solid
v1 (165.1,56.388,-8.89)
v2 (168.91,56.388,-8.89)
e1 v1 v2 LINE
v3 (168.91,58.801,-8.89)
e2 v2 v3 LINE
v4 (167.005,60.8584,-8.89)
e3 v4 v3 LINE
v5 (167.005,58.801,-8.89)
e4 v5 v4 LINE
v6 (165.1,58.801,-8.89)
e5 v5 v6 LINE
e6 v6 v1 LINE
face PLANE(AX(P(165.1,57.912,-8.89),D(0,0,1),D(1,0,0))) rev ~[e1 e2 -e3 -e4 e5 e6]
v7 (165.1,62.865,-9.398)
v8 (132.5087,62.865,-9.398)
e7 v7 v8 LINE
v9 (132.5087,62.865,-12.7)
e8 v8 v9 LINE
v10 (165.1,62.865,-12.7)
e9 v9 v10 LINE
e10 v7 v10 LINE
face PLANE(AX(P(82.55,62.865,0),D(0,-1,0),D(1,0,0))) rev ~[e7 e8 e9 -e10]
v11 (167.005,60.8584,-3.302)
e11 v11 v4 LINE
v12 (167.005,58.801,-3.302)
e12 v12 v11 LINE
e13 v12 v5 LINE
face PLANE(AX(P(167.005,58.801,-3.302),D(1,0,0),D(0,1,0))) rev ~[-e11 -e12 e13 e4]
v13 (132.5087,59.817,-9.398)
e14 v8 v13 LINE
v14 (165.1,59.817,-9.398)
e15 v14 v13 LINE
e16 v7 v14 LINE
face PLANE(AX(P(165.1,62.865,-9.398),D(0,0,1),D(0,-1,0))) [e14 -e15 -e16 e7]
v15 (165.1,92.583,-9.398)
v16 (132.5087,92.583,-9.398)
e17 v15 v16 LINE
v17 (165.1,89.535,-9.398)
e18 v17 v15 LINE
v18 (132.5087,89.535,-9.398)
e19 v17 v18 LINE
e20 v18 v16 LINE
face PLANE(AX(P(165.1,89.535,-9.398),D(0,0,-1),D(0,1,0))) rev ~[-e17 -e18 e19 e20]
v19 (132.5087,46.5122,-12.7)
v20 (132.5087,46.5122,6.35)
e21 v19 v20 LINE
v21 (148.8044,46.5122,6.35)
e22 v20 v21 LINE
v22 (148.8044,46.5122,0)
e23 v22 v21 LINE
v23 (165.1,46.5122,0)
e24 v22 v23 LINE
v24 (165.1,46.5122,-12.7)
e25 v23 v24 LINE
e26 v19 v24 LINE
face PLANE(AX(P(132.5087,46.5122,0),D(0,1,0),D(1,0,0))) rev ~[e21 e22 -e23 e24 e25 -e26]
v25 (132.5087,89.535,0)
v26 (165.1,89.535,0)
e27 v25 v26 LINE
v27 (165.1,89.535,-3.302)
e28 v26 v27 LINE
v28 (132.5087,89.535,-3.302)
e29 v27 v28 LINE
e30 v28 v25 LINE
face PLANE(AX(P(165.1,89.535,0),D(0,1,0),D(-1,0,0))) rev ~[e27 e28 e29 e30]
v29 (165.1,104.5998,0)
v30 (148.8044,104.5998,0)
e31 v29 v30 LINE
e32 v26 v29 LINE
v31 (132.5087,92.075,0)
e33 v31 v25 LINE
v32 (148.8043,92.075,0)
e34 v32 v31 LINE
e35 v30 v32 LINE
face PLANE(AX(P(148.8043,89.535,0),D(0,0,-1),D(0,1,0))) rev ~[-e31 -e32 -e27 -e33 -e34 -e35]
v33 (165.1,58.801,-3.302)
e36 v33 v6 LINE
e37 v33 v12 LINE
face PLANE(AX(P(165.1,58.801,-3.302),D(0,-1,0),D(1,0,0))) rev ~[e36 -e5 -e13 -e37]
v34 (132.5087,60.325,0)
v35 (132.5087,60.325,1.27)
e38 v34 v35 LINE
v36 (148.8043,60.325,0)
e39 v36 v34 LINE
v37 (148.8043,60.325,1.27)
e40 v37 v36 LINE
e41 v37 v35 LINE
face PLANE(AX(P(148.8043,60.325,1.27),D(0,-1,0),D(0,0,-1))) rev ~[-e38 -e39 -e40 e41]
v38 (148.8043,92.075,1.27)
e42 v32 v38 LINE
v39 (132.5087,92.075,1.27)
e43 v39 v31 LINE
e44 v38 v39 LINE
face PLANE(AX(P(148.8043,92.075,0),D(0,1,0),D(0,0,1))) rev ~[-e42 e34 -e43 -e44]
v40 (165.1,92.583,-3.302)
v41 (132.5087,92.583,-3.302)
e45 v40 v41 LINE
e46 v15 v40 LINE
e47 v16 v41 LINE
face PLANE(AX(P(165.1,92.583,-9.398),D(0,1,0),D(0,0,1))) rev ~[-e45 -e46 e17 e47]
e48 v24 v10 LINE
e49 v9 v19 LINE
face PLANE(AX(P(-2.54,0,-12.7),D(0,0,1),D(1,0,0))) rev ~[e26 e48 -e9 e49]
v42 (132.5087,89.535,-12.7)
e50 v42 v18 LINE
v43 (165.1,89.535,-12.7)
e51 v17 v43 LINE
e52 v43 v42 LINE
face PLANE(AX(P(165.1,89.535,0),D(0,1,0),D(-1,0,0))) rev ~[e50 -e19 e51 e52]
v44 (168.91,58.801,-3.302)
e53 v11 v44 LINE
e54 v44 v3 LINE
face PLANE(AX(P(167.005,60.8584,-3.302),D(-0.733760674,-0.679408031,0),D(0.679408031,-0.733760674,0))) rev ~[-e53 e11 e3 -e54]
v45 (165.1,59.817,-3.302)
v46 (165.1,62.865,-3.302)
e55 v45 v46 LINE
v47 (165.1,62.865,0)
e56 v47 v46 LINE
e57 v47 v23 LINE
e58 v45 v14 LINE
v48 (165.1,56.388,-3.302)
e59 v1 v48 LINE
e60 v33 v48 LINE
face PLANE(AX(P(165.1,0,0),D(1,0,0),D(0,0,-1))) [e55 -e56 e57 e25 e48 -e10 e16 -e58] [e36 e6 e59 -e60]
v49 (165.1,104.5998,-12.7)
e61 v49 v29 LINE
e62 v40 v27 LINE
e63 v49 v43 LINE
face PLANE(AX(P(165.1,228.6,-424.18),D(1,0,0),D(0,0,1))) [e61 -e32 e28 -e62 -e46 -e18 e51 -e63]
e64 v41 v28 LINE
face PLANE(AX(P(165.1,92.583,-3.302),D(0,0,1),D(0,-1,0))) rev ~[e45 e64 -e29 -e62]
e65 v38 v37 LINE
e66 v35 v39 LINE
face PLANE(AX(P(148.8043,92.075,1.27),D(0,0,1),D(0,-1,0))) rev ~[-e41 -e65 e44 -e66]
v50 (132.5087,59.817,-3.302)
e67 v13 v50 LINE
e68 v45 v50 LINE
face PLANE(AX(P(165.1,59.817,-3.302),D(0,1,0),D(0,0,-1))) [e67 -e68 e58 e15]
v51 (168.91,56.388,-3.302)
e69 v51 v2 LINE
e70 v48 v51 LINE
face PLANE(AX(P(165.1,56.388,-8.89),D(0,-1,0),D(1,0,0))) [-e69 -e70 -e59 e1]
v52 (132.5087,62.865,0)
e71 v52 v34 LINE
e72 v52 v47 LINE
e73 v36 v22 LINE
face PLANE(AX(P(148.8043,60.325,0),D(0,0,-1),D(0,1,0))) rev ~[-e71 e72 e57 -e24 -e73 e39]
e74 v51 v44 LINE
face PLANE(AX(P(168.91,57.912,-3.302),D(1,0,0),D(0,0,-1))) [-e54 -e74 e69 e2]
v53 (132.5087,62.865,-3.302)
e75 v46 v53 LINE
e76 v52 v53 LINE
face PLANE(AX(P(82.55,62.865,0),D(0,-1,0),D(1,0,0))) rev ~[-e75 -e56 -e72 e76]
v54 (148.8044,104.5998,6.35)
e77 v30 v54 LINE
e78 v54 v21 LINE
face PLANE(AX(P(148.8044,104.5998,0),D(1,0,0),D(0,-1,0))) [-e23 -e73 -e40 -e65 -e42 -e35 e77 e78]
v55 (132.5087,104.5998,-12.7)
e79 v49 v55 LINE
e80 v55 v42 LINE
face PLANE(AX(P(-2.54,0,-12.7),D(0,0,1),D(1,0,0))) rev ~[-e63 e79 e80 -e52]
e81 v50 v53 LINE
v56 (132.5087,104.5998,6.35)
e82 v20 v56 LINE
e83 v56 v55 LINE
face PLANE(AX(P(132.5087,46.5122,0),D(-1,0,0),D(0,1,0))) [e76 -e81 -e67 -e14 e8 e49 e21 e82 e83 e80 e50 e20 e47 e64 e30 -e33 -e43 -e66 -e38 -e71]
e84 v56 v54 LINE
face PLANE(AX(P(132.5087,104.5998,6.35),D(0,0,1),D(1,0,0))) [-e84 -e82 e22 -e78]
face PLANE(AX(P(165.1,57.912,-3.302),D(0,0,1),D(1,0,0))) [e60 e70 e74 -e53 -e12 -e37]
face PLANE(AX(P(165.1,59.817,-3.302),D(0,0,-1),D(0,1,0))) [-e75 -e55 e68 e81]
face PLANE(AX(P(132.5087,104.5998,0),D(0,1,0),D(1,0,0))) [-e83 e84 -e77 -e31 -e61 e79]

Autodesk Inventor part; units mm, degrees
ref_plane "YZ Plane" through (0, 0, 0) normal (1, 0, 0) x (0, 1, 0)
ref_plane "XZ Plane" through (0, 0, 0) normal (0, 1, 0) x (-1, 0, 0)
sketch "Sketch1" plane through (0, 0, 0) normal (1, 0, 0) x (0, 1, 0)
  line L0 (0, 0) -> (228.6, 0)
  line L1 (228.6, 0) -> (228.6, -424.18)
  line L2 (228.6, -424.18) -> (0, -424.18)
  line L3 (0, -424.18) -> (0, 0)
  point P0 (0, 0)
  dimension "d0" = 424.18
  dimension "d1" = 228.6
extrude "Extrusion1" add sketch "Sketch1" along normal blind 165.1
sketch "Sketch2" plane through (165.1, 0, 0) normal (1, 0, 0) x (0, 0, -1)
  line L0 (0, 0) -> (424.18, 0) construction
  line L1 (12.7, 0) -> (411.48, 0)
  line L2 (411.48, 0) -> (411.48, 165.1)
  line L3 (411.48, 165.1) -> (12.7, 165.1)
  line L4 (12.7, 165.1) -> (12.7, 0)
  line L5 (0, 228.6) -> (0, 0) construction
  line L6 (424.18, 0) -> (424.18, 228.6) construction
  dimension "d4" = 398.78
  dimension "d5" = 165.1
  dimension "d6" = 12.7
  dimension "d7" = 12.7
extrude "Extrusion2" cut sketch "Sketch2" against normal blind 148.59
sketch "Sketch3" plane through (0, 0, 0) normal (0, 0, 1) x (1, 0, 0)
  line L0 (165.1, 228.6) -> (165.1, 0) projected
  line L1 (165.1, 89.535) -> (82.55, 89.535)
  line L2 (69.215, 89.535) -> (69.215, 62.865) construction
  line L3 (82.55, 62.865) -> (165.1, 62.865)
  line L4 (165.1, 62.865) -> (165.1, 89.535)
  line L5 (0, 0) -> (165.1, 0) projected
  arc A0 (82.55, 89.535) -> (82.55, 62.865) centre (82.55, 76.2) ccw
  dimension "d10" = 95.885
  dimension "d11" = 26.67
  dimension "d12" = 62.865
extrude "Extrusion3" cut sketch "Sketch3" against normal blind 457.2
sketch "Sketch4" plane through (0, 228.6, 0) normal (0, 1, 0) x (1, 0, 0)
  line L0 (165.1, 12.7) -> (165.1, 411.48) construction
  line L1 (165.1, 12.7) -> (16.51, 12.7) construction
  line L2 (16.51, 12.7) -> (16.51, 411.48) construction
  line L3 (165.1, 411.48) -> (16.51, 411.48) construction
  line L4 (0, 424.18) -> (165.1, 424.18) construction
  line L5 (0, 424.18) -> (165.1, 424.18) construction
  circle A0 centre (82.55, 353.06) radius 43.815
  line L6 (0, 0) -> (0, 424.18) construction
  circle A1 centre (82.55, 259.08) radius 43.815
  line L7 (0, 212.09) -> (165.1, 212.09) construction
  line L8 (165.1, 424.18) -> (165.1, 0) construction
  circle A2 centre (82.55, 71.12) radius 43.815
  circle A3 centre (82.55, 165.1) radius 43.815
  dimension "d15" = 87.63
  dimension "d16" = 82.55
  dimension "d17" = 58.42
  dimension "d18" = 87.63
  dimension "d19" = 93.98
  dimension "d20" = 82.55
extrude "Extrusion4" cut sketch "Sketch4" against normal blind 76.2
sketch "Sketch5" plane through (0, 228.6, 0) normal (0, 1, 0) x (1, 0, 0)
  circle A0 centre (82.55, 165.1) radius 43.815 projected
  circle A1 centre (82.55, 353.06) radius 43.815 projected
  circle A2 centre (82.55, 259.08) radius 43.815 projected
  circle A3 centre (82.55, 71.12) radius 43.815 projected
  line L0 (0, 0) -> (0, 424.18) projected
  line L1 (0, 0) -> (165.1, 0) projected
  line L2 (165.1, 424.18) -> (165.1, 0) projected
  line L3 (0, 424.18) -> (165.1, 424.18) projected
  point P0 (0, 0)
extrude "Extrusion5" add sketch "Sketch5" along normal blind 53.34
sketch "Sketch7" plane through (0, 0, 0) normal (-1, 0, 0) x (0, 0, 1)
  line L0 (0, 0) -> (0, 281.94) projected
  line L1 (-424.18, 281.94) -> (0, 281.94) projected
  line L2 (-424.18, 281.94) -> (-424.18, 0) projected
  line L3 (-424.18, 0) -> (0, 0) projected
  point P0 (0, 0)
extrude "Extrusion6" add sketch "Sketch7" along normal blind 19.05
sketch "Sketch8" plane through (16.51, 0, 0) normal (1, 0, 0) x (0, 0, -1)
  line L0 (411.48, 0) -> (12.7, 0) projected
  line L1 (411.48, 165.1) -> (411.48, 0) projected
  line L2 (12.7, 165.1) -> (411.48, 165.1) projected
  line L3 (12.7, 0) -> (12.7, 165.1) projected
  point P0 (0, 0)
extrude "Extrusion7" cut sketch "Sketch8" against normal blind 19.05
sketch "Sketch12" plane through (165.1, 0, 0) normal (1, 0, 0) x (0, 0, -1)
  line L0 (0, 89.535) -> (12.7, 89.535) construction
  line L1 (3.302, 89.535) -> (9.398, 89.535)
  line L2 (9.398, 89.535) -> (9.398, 92.583)
  line L3 (9.398, 92.583) -> (3.302, 92.583)
  line L4 (3.302, 92.583) -> (3.302, 89.535)
  line L5 (0, 89.535) -> (0, 281.94) construction
  line L6 (12.7, 89.535) -> (12.7, 62.865) construction
  line L7 (0, 89.535) -> (12.7, 89.535) construction
  line L8 (0, 62.865) -> (0, 89.535) construction
  line L9 (0, 62.865) -> (12.7, 62.865) construction
  line L10 (0, 62.865) -> (0, 89.535) construction
  line L11 (0, 76.2) -> (12.7, 76.2) construction
  line L12 (3.302, 62.865) -> (9.398, 62.865)
  line L13 (9.398, 62.865) -> (9.398, 59.817)
  line L14 (9.398, 59.817) -> (3.302, 59.817)
  line L15 (3.302, 59.817) -> (3.302, 62.865)
  point P0 (0, 0)
  dimension "d44" = 6.096
  dimension "d45" = 3.048
  dimension "d46" = 3.302
extrude "Extrusion11" cut sketch "Sketch12" against normal blind 82.55
sketch "Sketch13" plane through (-19.05, 0, 0) normal (0, -1, 0) x (1, 0, 0)
  line L0 (16.51, -12.7) -> (184.15, -12.7) projected
  line L1 (184.15, 0) -> (184.15, -12.7) projected
  line L2 (0, 0) -> (184.15, 0) projected
  line L3 (0, -424.18) -> (0, 0) projected
  line L4 (184.15, -424.18) -> (0, -424.18) projected
  line L5 (184.15, -411.48) -> (184.15, -424.18) projected
  line L6 (184.15, -411.48) -> (16.51, -411.48) projected
  line L7 (16.51, -411.48) -> (16.51, -12.7) projected
  point P0 (19.05, 0)
extrude "Extrusion12" add sketch "Sketch13" along normal blind 5.08
ref_plane "Work Plane1" through (82.55, 89.535, -212.09) normal (0, 0, 1) x (1, 0, 0)
mirror "Mirror1" about plane through (82.55, 89.535, -212.09) normal (0, 0, 1) of "Extrusion11"
sketch "Sketch15" plane through (165.1, 0, 0) normal (1, 0, 0) x (0, 0, -1)
  line L0 (3.302, 59.817) -> (8.89, 59.817)
  line L1 (8.89, 59.817) -> (8.89, 57.912)
  line L2 (8.89, 57.912) -> (3.302, 57.912)
  line L3 (3.302, 57.912) -> (3.302, 59.817)
  line L4 (9.398, 59.817) -> (3.302, 59.817) projected
  point P0 (0, 0)
  dimension "d55" = 5.588
  dimension "d56" = 1.905
extrude "Extrusion14" add sketch "Sketch15" along normal blind 3.81
sketch "Sketch17" plane through (165.1, 57.912, -3.302) normal (0, 0, 1) x (1, 0, 0)
  line L0 (0, 1.905) -> (3.81, 1.905) projected
  line L1 (3.81, 1.905) -> (0, 1.905)
  line L2 (0, 1.905) -> (0, 0.889)
  line L3 (0, 0.889) -> (3.81, 0.889)
  line L4 (3.81, 0.889) -> (3.81, 1.905)
  point P0 (-165.1, -57.912)
  dimension "d60" = 3.81
  dimension "d61" = 1.016
extrude "Extrusion15" cut sketch "Sketch17" against normal blind 25.4
sketch "Sketch18" plane through (165.1, 57.912, -3.302) normal (0, 0, 1) x (1, 0, 0)
  line L0 (0, 1.905) -> (-82.55, 1.905) construction
  line L1 (3.81, 0) -> (3.81, 0.889) projected
  line L2 (1.905, 2.9464) -> (3.81, 0.889)
  line L3 (3.81, 0.889) -> (1.905, 0.889)
  line L4 (1.905, 0.889) -> (1.905, 2.9464)
  line L5 (0, 4.953) -> (0, -62.992) projected
  point P0 (-165.1, -57.912)
  dimension "d64" = 1.905
  dimension "d65" = 2.0574
extrude "Extrusion16" add sketch "Sketch18" against normal blind 5.588
sketch "Sketch19" plane through (165.1, 57.912, -8.89) normal (0, -1, 0) x (1, 0, 0)
  line L0 (0, 0) -> (0, 5.588) projected
  line L1 (0, 0) -> (3.81, 0) projected
  line L2 (3.81, 5.588) -> (3.81, 0) projected
  line L3 (0, 5.588) -> (3.81, 5.588) projected
  point P0 (-165.1, 8.89)
extrude "Extrusion17" add sketch "Sketch19" along normal blind 1.524
mirror "Mirror2" about plane through (82.55, 89.535, -212.09) normal (0, 0, 1) of "Extrusion14", "Extrusion15", "Extrusion16", "Extrusion17"
sketch "Sketch21" plane through (82.55, 89.535, 0) normal (0, 0, 1) x (1, 0, 0)
  line L0 (49.9587, -43.0228) -> (93.9109, -43.0228)
  line L1 (93.9109, -43.0228) -> (93.9109, 15.0648)
  line L2 (93.9109, 15.0648) -> (49.9587, 15.0648)
  line L3 (49.9587, 15.0648) -> (49.9587, -43.0228)
  point P0 (-82.55, -89.535)
extrude "Extrusion18" cut sketch "Sketch21" against normal blind 25.4 keep common part
sketch "Sketch22" plane through (132.5087, 104.5998, 0) normal (0, 0, 1) x (1, 0, 0)
  line L0 (0, -58.0876) -> (32.5913, -58.0876) projected
  line L1 (0, 0) -> (16.2957, 0)
  line L2 (16.2957, 0) -> (16.2957, -58.0876)
  line L3 (16.2957, -58.0876) -> (0, -58.0876)
  line L4 (0, -58.0876) -> (0, 0)
  point P0 (-132.5087, -104.5998)
extrude "Extrusion19" add sketch "Sketch22" along normal blind 6.35
sketch "Sketch23" plane through (148.8043, 62.865, 0) normal (1, 0, 0) x (0, 0, -1)
  line L0 (0, 26.67) -> (0, 41.7348) projected
  line L1 (0, 29.21) -> (-1.27, 29.21)
  line L2 (-1.27, 29.21) -> (-1.27, -2.54)
  line L3 (-1.27, -2.54) -> (0, -2.54)
  line L4 (0, -2.54) -> (0, 29.21)
  line L5 (0, 26.67) -> (3.302, 26.67) projected
  line L6 (3.302, 0) -> (0, 0) projected
  point P0 (0, -62.865)
  dimension "d74" = 1.27
  dimension "d75" = 2.54
  dimension "d76" = 2.54
extrude "Extrusion20" cut sketch "Sketch23" against normal blind 25.4
sketch "Sketch9" plane through (0, 281.94, 0) normal (0, 1, 0) x (1, 0, 0)
  line L0 (146.05, 19.05) -> (146.05, 405.13)
  line L1 (0, 405.13) -> (0, 19.05)
  line L2 (165.1, 424.18) -> (-19.05, 424.18) construction
  line L3 (-19.05, 0) -> (-19.05, 424.18) construction
  line L4 (165.1, 0) -> (165.1, 424.18) construction
  line L5 (165.1, 0) -> (-19.05, 0) construction
  circle A0 centre (82.55, 71.12) radius 43.815 construction
  circle A1 centre (82.55, 259.08) radius 43.815 construction
  circle A2 centre (82.55, 353.06) radius 43.815 construction
  circle A3 centre (82.55, 165.1) radius 43.815 construction
  line L6 (165.1, 0) -> (-19.05, 0) construction
  line L7 (165.1, 0) -> (165.1, 424.18) construction
  line L8 (165.1, 424.18) -> (-19.05, 424.18) construction
  line L9 (-19.05, 0) -> (-19.05, 424.18) construction
  line L10 (146.05, 405.13) -> (117.7739, 405.13)
  line L11 (47.3261, 405.13) -> (0, 405.13)
  arc A4 (47.3261, 405.13) -> (40.7894, 306.07) centre (82.55, 353.06) ccw
  arc A5 (124.3106, 306.07) -> (117.7739, 405.13) centre (82.55, 353.06) ccw
  arc A6 (40.7894, 306.07) -> (40.7894, 212.09) centre (82.55, 259.08) ccw
  arc A7 (124.3106, 212.09) -> (107.2668, 316.8822) centre (82.55, 259.08) ccw
  arc A8 (40.7894, 212.09) -> (40.7894, 118.11) centre (82.55, 165.1) ccw
  arc A9 (124.3106, 118.11) -> (124.3106, 212.09) centre (82.55, 165.1) ccw
  line L12 (0, 19.05) -> (47.3261, 19.05)
  line L13 (117.7739, 19.05) -> (146.05, 19.05)
  arc A10 (40.7894, 118.11) -> (47.3261, 19.05) centre (82.55, 71.12) ccw
  arc A11 (117.7739, 19.05) -> (124.3106, 118.11) centre (82.55, 71.12) ccw
  point P0 (0, 0)
  dimension "d30" = 19.05
  dimension "d31" = 19.05
sketch "Sketch10" plane through (0, 281.94, -19.05) normal (1, 0, 0) x (0, 0, -1)
  line L0 (405.13, 0) -> (405.13, -281.94) projected
  line L1 (-19.05, 0) -> (405.13, 0) projected
  line L2 (405.13, -101.6) -> (-19.05, -101.6)
  line L3 (-19.05, -101.6) -> (-19.05, 0)
  line L4 (-19.05, 0) -> (405.13, 0)
  line L5 (405.13, 0) -> (405.13, -101.6)
  line L6 (0, 0) -> (386.08, 0) projected
  line L7 (0, 0) -> (0, -101.6) projected
  line L8 (0, -101.6) -> (386.08, -101.6) projected
  line L9 (386.08, 0) -> (386.08, -101.6) projected
  point P0 (-19.05, -281.94)
  dimension "d39" = 0
sketch "Sketch11" plane through (0, 281.94, 0) normal (0, 1, 0) x (1, 0, 0)
  circle A0 centre (82.55, 71.12) radius 43.815 construction
  line L0 (19.05, 19.05) -> (19.05, 0) projected
  line L1 (19.05, 0) -> (47.3261, 0)
  line L2 (47.3261, 0) -> (47.3261, 19.05)
  line L3 (47.3261, 19.05) -> (19.05, 19.05)
  line L4 (19.05, 19.05) -> (19.05, 0)
  line L5 (165.1, 424.18) -> (19.05, 424.18) projected
  line L6 (47.3261, 405.13) -> (19.05, 405.13)
  line L7 (19.05, 405.13) -> (19.05, 424.18)
  line L8 (19.05, 424.18) -> (47.3261, 424.18)
  line L9 (47.3261, 424.18) -> (47.3261, 405.13)
  point P0 (0, 0)
properties part number "EngineClipTestBlock"
